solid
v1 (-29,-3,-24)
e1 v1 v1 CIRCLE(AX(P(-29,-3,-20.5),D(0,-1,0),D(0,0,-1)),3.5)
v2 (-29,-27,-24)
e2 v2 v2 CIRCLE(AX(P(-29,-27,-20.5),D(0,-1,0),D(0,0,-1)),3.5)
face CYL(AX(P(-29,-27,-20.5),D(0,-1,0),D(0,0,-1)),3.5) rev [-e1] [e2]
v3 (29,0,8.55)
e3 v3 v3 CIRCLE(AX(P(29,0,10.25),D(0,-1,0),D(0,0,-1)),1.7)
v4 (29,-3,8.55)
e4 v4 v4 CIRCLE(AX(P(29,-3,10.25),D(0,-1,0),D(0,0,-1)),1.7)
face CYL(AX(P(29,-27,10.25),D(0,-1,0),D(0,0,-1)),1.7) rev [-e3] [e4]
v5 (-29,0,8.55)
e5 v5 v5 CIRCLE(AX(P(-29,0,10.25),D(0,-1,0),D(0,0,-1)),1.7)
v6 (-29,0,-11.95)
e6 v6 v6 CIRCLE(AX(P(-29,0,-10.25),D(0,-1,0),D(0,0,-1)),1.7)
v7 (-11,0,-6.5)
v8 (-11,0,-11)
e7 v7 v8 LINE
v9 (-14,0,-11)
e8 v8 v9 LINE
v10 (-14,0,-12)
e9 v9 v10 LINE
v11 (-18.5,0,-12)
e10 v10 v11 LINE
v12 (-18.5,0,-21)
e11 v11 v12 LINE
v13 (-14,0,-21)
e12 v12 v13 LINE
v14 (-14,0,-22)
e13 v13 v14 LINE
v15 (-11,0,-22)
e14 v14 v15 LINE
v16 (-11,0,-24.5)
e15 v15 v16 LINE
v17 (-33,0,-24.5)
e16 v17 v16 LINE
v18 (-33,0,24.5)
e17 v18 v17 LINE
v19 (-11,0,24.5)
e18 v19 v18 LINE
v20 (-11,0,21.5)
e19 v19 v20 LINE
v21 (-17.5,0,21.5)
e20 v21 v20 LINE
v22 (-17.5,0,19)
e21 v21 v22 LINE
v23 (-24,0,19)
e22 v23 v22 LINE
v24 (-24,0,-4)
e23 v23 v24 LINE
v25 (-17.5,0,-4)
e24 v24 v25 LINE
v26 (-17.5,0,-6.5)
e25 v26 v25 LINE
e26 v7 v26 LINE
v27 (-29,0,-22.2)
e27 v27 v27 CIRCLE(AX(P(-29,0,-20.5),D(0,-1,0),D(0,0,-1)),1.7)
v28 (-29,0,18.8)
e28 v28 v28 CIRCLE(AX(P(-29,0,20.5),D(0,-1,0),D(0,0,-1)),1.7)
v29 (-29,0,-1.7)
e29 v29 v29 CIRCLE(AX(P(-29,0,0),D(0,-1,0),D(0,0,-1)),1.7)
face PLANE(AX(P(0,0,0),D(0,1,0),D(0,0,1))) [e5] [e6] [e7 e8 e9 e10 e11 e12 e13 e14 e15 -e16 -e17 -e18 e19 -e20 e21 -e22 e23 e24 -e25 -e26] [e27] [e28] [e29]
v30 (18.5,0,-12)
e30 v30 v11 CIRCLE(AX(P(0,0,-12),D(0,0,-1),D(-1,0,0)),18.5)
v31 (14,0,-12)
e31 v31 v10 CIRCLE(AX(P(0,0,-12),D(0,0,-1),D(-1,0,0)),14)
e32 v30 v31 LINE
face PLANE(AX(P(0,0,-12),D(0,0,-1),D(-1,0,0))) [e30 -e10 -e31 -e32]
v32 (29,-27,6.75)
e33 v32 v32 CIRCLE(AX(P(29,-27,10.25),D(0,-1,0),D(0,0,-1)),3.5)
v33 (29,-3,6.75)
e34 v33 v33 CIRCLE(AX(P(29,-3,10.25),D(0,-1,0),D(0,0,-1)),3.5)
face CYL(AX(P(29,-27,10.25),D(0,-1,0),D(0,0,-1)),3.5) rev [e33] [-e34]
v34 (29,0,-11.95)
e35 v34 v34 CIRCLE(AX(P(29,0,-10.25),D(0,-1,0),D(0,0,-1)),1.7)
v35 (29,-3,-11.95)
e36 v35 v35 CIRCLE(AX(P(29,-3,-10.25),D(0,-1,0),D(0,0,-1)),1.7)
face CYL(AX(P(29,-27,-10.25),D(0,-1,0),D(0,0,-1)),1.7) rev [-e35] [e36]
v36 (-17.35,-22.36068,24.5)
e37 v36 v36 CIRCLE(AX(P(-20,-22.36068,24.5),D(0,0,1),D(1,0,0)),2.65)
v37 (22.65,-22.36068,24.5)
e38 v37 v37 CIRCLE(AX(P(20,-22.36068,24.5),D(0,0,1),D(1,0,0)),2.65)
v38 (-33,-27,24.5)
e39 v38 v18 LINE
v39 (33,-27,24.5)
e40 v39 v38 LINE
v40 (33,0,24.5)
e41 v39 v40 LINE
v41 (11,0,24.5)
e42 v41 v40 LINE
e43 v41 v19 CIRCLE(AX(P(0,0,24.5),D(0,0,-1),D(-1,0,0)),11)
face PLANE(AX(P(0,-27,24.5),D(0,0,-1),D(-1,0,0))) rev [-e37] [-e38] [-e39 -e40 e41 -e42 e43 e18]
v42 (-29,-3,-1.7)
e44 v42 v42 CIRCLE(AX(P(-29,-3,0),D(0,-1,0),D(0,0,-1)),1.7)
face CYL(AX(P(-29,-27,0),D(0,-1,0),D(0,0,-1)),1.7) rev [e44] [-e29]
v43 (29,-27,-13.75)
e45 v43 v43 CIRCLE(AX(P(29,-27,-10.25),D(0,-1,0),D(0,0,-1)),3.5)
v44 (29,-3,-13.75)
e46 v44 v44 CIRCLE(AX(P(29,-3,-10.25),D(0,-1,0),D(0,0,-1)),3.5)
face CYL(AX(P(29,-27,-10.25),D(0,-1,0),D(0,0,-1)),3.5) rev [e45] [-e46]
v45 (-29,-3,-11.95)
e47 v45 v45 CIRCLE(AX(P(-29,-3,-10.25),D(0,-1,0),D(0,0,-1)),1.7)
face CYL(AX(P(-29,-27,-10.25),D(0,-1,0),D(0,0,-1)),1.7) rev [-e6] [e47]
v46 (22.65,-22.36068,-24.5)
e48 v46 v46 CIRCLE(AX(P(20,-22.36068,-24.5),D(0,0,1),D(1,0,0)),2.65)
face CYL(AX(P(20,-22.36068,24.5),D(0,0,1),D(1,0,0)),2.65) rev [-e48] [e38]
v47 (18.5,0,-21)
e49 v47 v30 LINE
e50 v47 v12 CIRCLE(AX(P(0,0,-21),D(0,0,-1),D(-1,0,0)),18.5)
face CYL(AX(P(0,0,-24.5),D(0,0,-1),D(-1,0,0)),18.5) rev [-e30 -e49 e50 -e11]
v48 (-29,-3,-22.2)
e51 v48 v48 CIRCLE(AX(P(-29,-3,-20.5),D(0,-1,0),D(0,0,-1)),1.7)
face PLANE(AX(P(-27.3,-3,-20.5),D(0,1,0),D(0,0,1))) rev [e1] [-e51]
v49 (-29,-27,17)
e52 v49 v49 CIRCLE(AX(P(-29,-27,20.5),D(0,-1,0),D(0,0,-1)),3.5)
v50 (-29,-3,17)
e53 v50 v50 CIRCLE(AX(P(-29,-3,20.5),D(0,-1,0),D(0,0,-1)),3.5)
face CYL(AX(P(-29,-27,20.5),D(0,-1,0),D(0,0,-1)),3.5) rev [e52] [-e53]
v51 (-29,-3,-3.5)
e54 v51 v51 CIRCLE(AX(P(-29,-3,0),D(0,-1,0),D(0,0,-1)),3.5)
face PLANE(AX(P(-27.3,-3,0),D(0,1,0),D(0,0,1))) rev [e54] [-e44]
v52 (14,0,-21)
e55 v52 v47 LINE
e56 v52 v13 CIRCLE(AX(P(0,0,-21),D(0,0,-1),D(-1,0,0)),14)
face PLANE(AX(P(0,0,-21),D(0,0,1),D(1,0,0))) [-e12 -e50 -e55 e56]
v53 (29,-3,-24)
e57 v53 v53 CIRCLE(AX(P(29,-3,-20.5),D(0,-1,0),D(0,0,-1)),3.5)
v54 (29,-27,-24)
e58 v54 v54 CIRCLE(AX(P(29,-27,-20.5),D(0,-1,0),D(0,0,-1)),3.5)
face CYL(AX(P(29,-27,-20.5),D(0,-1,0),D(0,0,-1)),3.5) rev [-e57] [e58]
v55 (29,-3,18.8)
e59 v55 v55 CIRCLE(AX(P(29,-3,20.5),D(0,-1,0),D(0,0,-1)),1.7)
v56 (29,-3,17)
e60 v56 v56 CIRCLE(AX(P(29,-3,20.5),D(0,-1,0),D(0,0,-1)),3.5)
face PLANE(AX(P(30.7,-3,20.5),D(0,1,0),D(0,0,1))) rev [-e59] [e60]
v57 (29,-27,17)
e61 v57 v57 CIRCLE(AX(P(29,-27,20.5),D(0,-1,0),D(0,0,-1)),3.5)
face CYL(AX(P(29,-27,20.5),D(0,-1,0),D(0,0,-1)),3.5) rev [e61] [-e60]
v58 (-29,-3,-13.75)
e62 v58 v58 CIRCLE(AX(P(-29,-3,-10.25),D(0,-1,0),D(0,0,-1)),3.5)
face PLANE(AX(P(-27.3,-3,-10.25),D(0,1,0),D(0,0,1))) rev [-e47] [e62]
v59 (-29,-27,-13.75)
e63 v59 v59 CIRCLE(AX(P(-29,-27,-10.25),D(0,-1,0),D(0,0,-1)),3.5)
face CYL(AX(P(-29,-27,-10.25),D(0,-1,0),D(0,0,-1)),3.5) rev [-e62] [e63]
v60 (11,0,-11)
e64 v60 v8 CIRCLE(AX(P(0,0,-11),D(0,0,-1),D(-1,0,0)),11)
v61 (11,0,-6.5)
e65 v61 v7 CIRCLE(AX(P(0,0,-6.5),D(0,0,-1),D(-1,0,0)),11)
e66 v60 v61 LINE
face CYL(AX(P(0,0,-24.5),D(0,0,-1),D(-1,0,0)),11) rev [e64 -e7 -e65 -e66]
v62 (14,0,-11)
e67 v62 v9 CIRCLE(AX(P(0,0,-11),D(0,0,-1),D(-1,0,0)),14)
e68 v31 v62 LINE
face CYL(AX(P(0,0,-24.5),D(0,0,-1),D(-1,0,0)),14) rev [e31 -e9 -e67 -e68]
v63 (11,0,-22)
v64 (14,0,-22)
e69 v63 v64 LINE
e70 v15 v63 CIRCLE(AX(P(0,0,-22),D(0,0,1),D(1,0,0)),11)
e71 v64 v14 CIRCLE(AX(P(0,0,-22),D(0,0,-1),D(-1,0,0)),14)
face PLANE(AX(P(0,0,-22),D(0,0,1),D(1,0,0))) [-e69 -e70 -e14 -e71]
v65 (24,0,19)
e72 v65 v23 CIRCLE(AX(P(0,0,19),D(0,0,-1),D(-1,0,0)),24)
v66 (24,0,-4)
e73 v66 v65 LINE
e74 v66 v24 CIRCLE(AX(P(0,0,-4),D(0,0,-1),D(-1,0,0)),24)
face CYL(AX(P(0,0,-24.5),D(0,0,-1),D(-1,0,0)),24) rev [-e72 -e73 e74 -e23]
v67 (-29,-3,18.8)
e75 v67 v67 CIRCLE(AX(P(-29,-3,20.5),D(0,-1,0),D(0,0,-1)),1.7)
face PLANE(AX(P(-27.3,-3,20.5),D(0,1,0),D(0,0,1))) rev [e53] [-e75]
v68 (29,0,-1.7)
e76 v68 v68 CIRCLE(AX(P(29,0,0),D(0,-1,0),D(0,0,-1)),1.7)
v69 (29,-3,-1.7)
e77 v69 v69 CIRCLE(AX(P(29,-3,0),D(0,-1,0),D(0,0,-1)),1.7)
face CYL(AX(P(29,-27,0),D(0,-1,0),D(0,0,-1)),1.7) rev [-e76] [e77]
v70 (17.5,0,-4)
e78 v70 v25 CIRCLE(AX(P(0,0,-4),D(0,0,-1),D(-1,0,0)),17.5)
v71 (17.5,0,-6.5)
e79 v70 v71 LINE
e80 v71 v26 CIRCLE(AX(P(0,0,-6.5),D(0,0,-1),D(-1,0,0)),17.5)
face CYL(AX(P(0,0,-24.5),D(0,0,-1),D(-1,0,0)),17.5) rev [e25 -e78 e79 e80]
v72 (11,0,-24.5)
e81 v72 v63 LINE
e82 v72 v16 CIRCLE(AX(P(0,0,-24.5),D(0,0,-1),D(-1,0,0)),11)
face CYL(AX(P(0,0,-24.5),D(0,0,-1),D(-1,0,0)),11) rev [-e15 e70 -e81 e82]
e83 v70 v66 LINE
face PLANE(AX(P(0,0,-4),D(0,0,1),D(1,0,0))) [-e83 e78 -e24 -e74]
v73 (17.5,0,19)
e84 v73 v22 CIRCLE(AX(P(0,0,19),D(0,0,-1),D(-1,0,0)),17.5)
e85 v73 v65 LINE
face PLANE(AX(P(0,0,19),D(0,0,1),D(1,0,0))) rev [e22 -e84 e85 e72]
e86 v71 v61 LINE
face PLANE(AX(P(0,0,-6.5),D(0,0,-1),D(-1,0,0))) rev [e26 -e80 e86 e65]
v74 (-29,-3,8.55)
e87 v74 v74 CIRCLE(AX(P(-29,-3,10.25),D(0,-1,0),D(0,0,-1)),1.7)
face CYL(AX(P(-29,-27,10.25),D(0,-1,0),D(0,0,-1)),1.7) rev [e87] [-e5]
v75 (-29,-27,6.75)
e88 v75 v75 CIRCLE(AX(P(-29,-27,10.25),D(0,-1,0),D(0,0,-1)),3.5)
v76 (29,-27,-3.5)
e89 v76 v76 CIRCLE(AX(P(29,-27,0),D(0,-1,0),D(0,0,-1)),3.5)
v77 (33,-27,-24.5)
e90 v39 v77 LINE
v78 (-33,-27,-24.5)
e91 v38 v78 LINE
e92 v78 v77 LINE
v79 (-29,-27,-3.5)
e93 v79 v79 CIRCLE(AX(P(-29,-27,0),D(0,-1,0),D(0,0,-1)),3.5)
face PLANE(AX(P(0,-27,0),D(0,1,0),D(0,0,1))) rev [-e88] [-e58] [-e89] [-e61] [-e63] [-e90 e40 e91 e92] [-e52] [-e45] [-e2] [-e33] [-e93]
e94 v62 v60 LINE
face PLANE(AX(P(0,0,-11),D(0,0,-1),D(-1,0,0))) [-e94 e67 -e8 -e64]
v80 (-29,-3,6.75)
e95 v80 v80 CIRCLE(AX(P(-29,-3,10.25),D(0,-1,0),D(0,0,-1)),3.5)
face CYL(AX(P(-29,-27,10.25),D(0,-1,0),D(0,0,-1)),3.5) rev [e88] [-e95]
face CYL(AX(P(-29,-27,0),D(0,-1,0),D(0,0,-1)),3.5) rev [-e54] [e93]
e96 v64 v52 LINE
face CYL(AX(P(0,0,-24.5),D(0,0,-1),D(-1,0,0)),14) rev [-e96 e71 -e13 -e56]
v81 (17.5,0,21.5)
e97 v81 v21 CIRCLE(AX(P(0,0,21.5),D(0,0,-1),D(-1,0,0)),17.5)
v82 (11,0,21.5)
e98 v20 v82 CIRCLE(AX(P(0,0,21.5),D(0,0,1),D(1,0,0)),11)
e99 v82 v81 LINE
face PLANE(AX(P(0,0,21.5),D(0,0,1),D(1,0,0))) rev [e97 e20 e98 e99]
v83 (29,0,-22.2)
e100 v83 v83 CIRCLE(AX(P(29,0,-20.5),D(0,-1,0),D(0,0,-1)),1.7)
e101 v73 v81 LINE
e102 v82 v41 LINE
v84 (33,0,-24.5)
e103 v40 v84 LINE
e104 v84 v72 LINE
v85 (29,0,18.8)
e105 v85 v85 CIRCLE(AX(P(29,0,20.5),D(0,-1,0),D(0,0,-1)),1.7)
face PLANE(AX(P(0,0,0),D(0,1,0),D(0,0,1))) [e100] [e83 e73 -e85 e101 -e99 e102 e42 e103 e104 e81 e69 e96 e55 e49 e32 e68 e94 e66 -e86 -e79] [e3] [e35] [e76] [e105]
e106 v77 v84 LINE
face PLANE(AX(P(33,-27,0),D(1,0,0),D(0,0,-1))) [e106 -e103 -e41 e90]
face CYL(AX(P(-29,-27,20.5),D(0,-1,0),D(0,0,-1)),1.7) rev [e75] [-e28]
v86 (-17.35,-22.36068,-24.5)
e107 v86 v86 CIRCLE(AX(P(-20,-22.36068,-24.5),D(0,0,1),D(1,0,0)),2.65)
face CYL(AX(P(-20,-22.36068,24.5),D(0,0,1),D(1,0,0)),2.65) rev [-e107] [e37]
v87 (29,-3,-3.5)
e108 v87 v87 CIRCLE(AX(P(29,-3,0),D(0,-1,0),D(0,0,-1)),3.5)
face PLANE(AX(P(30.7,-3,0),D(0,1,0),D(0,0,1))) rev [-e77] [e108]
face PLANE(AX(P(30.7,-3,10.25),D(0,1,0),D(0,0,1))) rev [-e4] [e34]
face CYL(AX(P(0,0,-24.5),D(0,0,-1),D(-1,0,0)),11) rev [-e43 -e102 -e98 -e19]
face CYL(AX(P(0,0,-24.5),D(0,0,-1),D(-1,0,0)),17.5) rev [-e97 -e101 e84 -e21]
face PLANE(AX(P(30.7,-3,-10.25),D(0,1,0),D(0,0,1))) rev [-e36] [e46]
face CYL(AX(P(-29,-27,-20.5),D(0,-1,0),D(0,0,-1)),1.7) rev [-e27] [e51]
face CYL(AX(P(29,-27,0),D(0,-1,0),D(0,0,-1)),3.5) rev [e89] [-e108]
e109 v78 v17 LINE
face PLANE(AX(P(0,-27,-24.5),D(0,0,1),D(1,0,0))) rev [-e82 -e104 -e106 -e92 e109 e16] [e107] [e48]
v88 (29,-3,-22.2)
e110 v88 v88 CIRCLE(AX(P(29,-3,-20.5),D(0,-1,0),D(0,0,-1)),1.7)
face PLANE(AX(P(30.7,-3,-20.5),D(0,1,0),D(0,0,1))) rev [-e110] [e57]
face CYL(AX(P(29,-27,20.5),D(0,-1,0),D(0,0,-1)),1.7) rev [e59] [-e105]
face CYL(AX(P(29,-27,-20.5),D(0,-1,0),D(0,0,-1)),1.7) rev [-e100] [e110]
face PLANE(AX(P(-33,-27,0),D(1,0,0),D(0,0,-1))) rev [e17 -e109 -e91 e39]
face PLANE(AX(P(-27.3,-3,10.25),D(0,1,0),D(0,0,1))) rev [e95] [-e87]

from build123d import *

# Parameters (mm, degrees)
PILLOW_SKETCH_W                                  = 22
PILLOW_SKETCH_H                                  = 49
PILLOW_SKETCH_W_2                                = 11
BASE_BOSS_EXTRUDE_DEPTH                          = 27
PILLOW_SKETCH_4_W                                = 11
PILLOW_SKETCH_4_H                                = 49
THRUST_START                                     = -4
THRUST_BEARING_STACK_CUT_REVOLVE_DEPTH           = 23
THRUST_START_2                                   = -6.5
THRUST_BEARING_STACK_CUT_REVOLVE_2_DEPTH         = 28
PILLOW_SKETCH_6_W                                = 14
PILLOW_SKETCH_6_H                                = 1
CBORE_FOR_M3_PAN_HEAD_MACHINE_SCREW1_D           = 3.4
CBORE_FOR_M3_PAN_HEAD_MACHINE_SCREW1_CBORE_D     = 7
CBORE_FOR_M3_PAN_HEAD_MACHINE_SCREW1_CBORE_DEPTH = 24
STEPPER_PLATE_MOUNT_M5_CLEARANCE_HOLE_D          = 5.3


# Read off the part's stored shape, not the designer's step: Thrust Bearing Stack Cut-Revolve
with BuildPart() as part:
    # Pillow Sketch → Base Boss-Extrude (new body)
    with BuildSketch(Plane(origin=(0, 0, 0), x_dir=(1, 0, 0), z_dir=(0, 1, 0))):
        with Locations((-22, 0)):
            Rectangle(PILLOW_SKETCH_W, PILLOW_SKETCH_H)
        with Locations((-5.5, 0)):
            Rectangle(PILLOW_SKETCH_W_2, PILLOW_SKETCH_H)
    base_boss_extrude = extrude(amount=-BASE_BOSS_EXTRUDE_DEPTH)

    # Pillow Sketch<4> → Shaft Clearance Cut-Revolve (revolve, cut)
    with BuildSketch(Plane(origin=(0, 0, 0), x_dir=(1, 0, 0), z_dir=(0, 1, 0))):
        with Locations((-5.5, 0)):
            Rectangle(PILLOW_SKETCH_4_W, PILLOW_SKETCH_4_H)
    shaft_clearance_cut_revolve = revolve(axis=Axis((0, 0, -24.5), (0, 0, 1)), mode=Mode.SUBTRACT)

    # Thrust Bearing Stack Cut-Revolve outline → Thrust Bearing Stack Cut-Revolve (cut)
    with BuildSketch(Plane.XY.offset(THRUST_START)):
        with BuildLine():
            ThreePointArc((-24, 0), (-16.970562748, -16.970562748), (0, -24))
            Line((0, -24), (0, -11))
            ThreePointArc((0, -11), (-7.778174593, -7.778174593), (-11, 0))
            Line((-11, 0), (-24, 0))
        make_face()
    thrust_bearing_stack_cut_revolve = extrude(amount=THRUST_BEARING_STACK_CUT_REVOLVE_DEPTH, mode=Mode.SUBTRACT)

    # Thrust Bearing Stack Cut-Revolve 2 outli → Thrust Bearing Stack Cut-Revolve 2 (cut)
    with BuildSketch(Plane.XY.offset(THRUST_START_2)):
        with BuildLine():
            ThreePointArc((-17.5, 0), (-12.374368671, -12.374368671), (0, -17.5))
            Line((0, -17.5), (0, -11))
            ThreePointArc((0, -11), (-7.778174593, -7.778174593), (-11, 0))
            Line((-11, 0), (-17.5, 0))
        make_face()
    thrust_bearing_stack_cut_revolve_2 = extrude(amount=THRUST_BEARING_STACK_CUT_REVOLVE_2_DEPTH, mode=Mode.SUBTRACT)

    # Pillow Sketch<6> → Rotary Bearing Cut-Revolve (revolve, cut)
    with BuildSketch(Plane(origin=(0, 0, 0), x_dir=(1, 0, 0), z_dir=(0, 1, 0))):
        Polygon((14, 21), (0, 21), (0, 12), (14, 12), (18.5, 12), (18.5, 21), align=None)
        with Locations((7, 21.5)):
            Rectangle(PILLOW_SKETCH_6_W, PILLOW_SKETCH_6_H)
        with Locations((7, 11.5)):
            Rectangle(PILLOW_SKETCH_6_W, PILLOW_SKETCH_6_H)
    rotary_bearing_cut_revolve = revolve(axis=Axis((0, 0, -24.5), (0, 0, 1)), mode=Mode.SUBTRACT)

    # CBORE for M3 Pan Head Machine Screw1 (through all)
    with Locations(Plane(origin=(0, -27, 0), x_dir=(-1, 0, 0), z_dir=(0, -1, 0))):
        with Locations((29, -20.5), (29, -10.25), (29, 0), (29, 10.25), (29, 20.5)):
            cbore_for_m3_pan_head_machine_screw1 = CounterBoreHole(CBORE_FOR_M3_PAN_HEAD_MACHINE_SCREW1_D / 2, CBORE_FOR_M3_PAN_HEAD_MACHINE_SCREW1_CBORE_D / 2, CBORE_FOR_M3_PAN_HEAD_MACHINE_SCREW1_CBORE_DEPTH)

    # Cover Mirror: Base Boss-Extrude, Shaft Clearance Cut-Revolve, Thrust Bearing Stack Cut-Revolve, Thrust Bearing Stack Cut-Revolve 2, Rotary Bearing Cut-Revolve, CBORE for M3 Pan Head Machine Screw1 across plane
    add(base_boss_extrude.mirror(Plane(origin=(0, 0, 0), x_dir=(0, 0, 1), z_dir=(1, 0, 0))))
    add(shaft_clearance_cut_revolve.mirror(Plane(origin=(0, 0, 0), x_dir=(0, 0, 1), z_dir=(1, 0, 0))), mode=Mode.SUBTRACT)
    add(thrust_bearing_stack_cut_revolve.mirror(Plane(origin=(0, 0, 0), x_dir=(0, 0, 1), z_dir=(1, 0, 0))), mode=Mode.SUBTRACT)
    add(thrust_bearing_stack_cut_revolve_2.mirror(Plane(origin=(0, 0, 0), x_dir=(0, 0, 1), z_dir=(1, 0, 0))), mode=Mode.SUBTRACT)
    add(rotary_bearing_cut_revolve.mirror(Plane(origin=(0, 0, 0), x_dir=(0, 0, 1), z_dir=(1, 0, 0))), mode=Mode.SUBTRACT)
    add(cbore_for_m3_pan_head_machine_screw1.mirror(Plane(origin=(0, 0, 0), x_dir=(0, 0, 1), z_dir=(1, 0, 0))), mode=Mode.SUBTRACT)

    # Stepper Plate Mount M5 Clearance Hole (through all)
    with Locations(Plane.XY.offset(24.5)):
        with Locations((-20, -22.360679775), (20, -22.360679775)):
            Hole(STEPPER_PLATE_MOUNT_M5_CLEARANCE_HOLE_D / 2)


solid = part.part
